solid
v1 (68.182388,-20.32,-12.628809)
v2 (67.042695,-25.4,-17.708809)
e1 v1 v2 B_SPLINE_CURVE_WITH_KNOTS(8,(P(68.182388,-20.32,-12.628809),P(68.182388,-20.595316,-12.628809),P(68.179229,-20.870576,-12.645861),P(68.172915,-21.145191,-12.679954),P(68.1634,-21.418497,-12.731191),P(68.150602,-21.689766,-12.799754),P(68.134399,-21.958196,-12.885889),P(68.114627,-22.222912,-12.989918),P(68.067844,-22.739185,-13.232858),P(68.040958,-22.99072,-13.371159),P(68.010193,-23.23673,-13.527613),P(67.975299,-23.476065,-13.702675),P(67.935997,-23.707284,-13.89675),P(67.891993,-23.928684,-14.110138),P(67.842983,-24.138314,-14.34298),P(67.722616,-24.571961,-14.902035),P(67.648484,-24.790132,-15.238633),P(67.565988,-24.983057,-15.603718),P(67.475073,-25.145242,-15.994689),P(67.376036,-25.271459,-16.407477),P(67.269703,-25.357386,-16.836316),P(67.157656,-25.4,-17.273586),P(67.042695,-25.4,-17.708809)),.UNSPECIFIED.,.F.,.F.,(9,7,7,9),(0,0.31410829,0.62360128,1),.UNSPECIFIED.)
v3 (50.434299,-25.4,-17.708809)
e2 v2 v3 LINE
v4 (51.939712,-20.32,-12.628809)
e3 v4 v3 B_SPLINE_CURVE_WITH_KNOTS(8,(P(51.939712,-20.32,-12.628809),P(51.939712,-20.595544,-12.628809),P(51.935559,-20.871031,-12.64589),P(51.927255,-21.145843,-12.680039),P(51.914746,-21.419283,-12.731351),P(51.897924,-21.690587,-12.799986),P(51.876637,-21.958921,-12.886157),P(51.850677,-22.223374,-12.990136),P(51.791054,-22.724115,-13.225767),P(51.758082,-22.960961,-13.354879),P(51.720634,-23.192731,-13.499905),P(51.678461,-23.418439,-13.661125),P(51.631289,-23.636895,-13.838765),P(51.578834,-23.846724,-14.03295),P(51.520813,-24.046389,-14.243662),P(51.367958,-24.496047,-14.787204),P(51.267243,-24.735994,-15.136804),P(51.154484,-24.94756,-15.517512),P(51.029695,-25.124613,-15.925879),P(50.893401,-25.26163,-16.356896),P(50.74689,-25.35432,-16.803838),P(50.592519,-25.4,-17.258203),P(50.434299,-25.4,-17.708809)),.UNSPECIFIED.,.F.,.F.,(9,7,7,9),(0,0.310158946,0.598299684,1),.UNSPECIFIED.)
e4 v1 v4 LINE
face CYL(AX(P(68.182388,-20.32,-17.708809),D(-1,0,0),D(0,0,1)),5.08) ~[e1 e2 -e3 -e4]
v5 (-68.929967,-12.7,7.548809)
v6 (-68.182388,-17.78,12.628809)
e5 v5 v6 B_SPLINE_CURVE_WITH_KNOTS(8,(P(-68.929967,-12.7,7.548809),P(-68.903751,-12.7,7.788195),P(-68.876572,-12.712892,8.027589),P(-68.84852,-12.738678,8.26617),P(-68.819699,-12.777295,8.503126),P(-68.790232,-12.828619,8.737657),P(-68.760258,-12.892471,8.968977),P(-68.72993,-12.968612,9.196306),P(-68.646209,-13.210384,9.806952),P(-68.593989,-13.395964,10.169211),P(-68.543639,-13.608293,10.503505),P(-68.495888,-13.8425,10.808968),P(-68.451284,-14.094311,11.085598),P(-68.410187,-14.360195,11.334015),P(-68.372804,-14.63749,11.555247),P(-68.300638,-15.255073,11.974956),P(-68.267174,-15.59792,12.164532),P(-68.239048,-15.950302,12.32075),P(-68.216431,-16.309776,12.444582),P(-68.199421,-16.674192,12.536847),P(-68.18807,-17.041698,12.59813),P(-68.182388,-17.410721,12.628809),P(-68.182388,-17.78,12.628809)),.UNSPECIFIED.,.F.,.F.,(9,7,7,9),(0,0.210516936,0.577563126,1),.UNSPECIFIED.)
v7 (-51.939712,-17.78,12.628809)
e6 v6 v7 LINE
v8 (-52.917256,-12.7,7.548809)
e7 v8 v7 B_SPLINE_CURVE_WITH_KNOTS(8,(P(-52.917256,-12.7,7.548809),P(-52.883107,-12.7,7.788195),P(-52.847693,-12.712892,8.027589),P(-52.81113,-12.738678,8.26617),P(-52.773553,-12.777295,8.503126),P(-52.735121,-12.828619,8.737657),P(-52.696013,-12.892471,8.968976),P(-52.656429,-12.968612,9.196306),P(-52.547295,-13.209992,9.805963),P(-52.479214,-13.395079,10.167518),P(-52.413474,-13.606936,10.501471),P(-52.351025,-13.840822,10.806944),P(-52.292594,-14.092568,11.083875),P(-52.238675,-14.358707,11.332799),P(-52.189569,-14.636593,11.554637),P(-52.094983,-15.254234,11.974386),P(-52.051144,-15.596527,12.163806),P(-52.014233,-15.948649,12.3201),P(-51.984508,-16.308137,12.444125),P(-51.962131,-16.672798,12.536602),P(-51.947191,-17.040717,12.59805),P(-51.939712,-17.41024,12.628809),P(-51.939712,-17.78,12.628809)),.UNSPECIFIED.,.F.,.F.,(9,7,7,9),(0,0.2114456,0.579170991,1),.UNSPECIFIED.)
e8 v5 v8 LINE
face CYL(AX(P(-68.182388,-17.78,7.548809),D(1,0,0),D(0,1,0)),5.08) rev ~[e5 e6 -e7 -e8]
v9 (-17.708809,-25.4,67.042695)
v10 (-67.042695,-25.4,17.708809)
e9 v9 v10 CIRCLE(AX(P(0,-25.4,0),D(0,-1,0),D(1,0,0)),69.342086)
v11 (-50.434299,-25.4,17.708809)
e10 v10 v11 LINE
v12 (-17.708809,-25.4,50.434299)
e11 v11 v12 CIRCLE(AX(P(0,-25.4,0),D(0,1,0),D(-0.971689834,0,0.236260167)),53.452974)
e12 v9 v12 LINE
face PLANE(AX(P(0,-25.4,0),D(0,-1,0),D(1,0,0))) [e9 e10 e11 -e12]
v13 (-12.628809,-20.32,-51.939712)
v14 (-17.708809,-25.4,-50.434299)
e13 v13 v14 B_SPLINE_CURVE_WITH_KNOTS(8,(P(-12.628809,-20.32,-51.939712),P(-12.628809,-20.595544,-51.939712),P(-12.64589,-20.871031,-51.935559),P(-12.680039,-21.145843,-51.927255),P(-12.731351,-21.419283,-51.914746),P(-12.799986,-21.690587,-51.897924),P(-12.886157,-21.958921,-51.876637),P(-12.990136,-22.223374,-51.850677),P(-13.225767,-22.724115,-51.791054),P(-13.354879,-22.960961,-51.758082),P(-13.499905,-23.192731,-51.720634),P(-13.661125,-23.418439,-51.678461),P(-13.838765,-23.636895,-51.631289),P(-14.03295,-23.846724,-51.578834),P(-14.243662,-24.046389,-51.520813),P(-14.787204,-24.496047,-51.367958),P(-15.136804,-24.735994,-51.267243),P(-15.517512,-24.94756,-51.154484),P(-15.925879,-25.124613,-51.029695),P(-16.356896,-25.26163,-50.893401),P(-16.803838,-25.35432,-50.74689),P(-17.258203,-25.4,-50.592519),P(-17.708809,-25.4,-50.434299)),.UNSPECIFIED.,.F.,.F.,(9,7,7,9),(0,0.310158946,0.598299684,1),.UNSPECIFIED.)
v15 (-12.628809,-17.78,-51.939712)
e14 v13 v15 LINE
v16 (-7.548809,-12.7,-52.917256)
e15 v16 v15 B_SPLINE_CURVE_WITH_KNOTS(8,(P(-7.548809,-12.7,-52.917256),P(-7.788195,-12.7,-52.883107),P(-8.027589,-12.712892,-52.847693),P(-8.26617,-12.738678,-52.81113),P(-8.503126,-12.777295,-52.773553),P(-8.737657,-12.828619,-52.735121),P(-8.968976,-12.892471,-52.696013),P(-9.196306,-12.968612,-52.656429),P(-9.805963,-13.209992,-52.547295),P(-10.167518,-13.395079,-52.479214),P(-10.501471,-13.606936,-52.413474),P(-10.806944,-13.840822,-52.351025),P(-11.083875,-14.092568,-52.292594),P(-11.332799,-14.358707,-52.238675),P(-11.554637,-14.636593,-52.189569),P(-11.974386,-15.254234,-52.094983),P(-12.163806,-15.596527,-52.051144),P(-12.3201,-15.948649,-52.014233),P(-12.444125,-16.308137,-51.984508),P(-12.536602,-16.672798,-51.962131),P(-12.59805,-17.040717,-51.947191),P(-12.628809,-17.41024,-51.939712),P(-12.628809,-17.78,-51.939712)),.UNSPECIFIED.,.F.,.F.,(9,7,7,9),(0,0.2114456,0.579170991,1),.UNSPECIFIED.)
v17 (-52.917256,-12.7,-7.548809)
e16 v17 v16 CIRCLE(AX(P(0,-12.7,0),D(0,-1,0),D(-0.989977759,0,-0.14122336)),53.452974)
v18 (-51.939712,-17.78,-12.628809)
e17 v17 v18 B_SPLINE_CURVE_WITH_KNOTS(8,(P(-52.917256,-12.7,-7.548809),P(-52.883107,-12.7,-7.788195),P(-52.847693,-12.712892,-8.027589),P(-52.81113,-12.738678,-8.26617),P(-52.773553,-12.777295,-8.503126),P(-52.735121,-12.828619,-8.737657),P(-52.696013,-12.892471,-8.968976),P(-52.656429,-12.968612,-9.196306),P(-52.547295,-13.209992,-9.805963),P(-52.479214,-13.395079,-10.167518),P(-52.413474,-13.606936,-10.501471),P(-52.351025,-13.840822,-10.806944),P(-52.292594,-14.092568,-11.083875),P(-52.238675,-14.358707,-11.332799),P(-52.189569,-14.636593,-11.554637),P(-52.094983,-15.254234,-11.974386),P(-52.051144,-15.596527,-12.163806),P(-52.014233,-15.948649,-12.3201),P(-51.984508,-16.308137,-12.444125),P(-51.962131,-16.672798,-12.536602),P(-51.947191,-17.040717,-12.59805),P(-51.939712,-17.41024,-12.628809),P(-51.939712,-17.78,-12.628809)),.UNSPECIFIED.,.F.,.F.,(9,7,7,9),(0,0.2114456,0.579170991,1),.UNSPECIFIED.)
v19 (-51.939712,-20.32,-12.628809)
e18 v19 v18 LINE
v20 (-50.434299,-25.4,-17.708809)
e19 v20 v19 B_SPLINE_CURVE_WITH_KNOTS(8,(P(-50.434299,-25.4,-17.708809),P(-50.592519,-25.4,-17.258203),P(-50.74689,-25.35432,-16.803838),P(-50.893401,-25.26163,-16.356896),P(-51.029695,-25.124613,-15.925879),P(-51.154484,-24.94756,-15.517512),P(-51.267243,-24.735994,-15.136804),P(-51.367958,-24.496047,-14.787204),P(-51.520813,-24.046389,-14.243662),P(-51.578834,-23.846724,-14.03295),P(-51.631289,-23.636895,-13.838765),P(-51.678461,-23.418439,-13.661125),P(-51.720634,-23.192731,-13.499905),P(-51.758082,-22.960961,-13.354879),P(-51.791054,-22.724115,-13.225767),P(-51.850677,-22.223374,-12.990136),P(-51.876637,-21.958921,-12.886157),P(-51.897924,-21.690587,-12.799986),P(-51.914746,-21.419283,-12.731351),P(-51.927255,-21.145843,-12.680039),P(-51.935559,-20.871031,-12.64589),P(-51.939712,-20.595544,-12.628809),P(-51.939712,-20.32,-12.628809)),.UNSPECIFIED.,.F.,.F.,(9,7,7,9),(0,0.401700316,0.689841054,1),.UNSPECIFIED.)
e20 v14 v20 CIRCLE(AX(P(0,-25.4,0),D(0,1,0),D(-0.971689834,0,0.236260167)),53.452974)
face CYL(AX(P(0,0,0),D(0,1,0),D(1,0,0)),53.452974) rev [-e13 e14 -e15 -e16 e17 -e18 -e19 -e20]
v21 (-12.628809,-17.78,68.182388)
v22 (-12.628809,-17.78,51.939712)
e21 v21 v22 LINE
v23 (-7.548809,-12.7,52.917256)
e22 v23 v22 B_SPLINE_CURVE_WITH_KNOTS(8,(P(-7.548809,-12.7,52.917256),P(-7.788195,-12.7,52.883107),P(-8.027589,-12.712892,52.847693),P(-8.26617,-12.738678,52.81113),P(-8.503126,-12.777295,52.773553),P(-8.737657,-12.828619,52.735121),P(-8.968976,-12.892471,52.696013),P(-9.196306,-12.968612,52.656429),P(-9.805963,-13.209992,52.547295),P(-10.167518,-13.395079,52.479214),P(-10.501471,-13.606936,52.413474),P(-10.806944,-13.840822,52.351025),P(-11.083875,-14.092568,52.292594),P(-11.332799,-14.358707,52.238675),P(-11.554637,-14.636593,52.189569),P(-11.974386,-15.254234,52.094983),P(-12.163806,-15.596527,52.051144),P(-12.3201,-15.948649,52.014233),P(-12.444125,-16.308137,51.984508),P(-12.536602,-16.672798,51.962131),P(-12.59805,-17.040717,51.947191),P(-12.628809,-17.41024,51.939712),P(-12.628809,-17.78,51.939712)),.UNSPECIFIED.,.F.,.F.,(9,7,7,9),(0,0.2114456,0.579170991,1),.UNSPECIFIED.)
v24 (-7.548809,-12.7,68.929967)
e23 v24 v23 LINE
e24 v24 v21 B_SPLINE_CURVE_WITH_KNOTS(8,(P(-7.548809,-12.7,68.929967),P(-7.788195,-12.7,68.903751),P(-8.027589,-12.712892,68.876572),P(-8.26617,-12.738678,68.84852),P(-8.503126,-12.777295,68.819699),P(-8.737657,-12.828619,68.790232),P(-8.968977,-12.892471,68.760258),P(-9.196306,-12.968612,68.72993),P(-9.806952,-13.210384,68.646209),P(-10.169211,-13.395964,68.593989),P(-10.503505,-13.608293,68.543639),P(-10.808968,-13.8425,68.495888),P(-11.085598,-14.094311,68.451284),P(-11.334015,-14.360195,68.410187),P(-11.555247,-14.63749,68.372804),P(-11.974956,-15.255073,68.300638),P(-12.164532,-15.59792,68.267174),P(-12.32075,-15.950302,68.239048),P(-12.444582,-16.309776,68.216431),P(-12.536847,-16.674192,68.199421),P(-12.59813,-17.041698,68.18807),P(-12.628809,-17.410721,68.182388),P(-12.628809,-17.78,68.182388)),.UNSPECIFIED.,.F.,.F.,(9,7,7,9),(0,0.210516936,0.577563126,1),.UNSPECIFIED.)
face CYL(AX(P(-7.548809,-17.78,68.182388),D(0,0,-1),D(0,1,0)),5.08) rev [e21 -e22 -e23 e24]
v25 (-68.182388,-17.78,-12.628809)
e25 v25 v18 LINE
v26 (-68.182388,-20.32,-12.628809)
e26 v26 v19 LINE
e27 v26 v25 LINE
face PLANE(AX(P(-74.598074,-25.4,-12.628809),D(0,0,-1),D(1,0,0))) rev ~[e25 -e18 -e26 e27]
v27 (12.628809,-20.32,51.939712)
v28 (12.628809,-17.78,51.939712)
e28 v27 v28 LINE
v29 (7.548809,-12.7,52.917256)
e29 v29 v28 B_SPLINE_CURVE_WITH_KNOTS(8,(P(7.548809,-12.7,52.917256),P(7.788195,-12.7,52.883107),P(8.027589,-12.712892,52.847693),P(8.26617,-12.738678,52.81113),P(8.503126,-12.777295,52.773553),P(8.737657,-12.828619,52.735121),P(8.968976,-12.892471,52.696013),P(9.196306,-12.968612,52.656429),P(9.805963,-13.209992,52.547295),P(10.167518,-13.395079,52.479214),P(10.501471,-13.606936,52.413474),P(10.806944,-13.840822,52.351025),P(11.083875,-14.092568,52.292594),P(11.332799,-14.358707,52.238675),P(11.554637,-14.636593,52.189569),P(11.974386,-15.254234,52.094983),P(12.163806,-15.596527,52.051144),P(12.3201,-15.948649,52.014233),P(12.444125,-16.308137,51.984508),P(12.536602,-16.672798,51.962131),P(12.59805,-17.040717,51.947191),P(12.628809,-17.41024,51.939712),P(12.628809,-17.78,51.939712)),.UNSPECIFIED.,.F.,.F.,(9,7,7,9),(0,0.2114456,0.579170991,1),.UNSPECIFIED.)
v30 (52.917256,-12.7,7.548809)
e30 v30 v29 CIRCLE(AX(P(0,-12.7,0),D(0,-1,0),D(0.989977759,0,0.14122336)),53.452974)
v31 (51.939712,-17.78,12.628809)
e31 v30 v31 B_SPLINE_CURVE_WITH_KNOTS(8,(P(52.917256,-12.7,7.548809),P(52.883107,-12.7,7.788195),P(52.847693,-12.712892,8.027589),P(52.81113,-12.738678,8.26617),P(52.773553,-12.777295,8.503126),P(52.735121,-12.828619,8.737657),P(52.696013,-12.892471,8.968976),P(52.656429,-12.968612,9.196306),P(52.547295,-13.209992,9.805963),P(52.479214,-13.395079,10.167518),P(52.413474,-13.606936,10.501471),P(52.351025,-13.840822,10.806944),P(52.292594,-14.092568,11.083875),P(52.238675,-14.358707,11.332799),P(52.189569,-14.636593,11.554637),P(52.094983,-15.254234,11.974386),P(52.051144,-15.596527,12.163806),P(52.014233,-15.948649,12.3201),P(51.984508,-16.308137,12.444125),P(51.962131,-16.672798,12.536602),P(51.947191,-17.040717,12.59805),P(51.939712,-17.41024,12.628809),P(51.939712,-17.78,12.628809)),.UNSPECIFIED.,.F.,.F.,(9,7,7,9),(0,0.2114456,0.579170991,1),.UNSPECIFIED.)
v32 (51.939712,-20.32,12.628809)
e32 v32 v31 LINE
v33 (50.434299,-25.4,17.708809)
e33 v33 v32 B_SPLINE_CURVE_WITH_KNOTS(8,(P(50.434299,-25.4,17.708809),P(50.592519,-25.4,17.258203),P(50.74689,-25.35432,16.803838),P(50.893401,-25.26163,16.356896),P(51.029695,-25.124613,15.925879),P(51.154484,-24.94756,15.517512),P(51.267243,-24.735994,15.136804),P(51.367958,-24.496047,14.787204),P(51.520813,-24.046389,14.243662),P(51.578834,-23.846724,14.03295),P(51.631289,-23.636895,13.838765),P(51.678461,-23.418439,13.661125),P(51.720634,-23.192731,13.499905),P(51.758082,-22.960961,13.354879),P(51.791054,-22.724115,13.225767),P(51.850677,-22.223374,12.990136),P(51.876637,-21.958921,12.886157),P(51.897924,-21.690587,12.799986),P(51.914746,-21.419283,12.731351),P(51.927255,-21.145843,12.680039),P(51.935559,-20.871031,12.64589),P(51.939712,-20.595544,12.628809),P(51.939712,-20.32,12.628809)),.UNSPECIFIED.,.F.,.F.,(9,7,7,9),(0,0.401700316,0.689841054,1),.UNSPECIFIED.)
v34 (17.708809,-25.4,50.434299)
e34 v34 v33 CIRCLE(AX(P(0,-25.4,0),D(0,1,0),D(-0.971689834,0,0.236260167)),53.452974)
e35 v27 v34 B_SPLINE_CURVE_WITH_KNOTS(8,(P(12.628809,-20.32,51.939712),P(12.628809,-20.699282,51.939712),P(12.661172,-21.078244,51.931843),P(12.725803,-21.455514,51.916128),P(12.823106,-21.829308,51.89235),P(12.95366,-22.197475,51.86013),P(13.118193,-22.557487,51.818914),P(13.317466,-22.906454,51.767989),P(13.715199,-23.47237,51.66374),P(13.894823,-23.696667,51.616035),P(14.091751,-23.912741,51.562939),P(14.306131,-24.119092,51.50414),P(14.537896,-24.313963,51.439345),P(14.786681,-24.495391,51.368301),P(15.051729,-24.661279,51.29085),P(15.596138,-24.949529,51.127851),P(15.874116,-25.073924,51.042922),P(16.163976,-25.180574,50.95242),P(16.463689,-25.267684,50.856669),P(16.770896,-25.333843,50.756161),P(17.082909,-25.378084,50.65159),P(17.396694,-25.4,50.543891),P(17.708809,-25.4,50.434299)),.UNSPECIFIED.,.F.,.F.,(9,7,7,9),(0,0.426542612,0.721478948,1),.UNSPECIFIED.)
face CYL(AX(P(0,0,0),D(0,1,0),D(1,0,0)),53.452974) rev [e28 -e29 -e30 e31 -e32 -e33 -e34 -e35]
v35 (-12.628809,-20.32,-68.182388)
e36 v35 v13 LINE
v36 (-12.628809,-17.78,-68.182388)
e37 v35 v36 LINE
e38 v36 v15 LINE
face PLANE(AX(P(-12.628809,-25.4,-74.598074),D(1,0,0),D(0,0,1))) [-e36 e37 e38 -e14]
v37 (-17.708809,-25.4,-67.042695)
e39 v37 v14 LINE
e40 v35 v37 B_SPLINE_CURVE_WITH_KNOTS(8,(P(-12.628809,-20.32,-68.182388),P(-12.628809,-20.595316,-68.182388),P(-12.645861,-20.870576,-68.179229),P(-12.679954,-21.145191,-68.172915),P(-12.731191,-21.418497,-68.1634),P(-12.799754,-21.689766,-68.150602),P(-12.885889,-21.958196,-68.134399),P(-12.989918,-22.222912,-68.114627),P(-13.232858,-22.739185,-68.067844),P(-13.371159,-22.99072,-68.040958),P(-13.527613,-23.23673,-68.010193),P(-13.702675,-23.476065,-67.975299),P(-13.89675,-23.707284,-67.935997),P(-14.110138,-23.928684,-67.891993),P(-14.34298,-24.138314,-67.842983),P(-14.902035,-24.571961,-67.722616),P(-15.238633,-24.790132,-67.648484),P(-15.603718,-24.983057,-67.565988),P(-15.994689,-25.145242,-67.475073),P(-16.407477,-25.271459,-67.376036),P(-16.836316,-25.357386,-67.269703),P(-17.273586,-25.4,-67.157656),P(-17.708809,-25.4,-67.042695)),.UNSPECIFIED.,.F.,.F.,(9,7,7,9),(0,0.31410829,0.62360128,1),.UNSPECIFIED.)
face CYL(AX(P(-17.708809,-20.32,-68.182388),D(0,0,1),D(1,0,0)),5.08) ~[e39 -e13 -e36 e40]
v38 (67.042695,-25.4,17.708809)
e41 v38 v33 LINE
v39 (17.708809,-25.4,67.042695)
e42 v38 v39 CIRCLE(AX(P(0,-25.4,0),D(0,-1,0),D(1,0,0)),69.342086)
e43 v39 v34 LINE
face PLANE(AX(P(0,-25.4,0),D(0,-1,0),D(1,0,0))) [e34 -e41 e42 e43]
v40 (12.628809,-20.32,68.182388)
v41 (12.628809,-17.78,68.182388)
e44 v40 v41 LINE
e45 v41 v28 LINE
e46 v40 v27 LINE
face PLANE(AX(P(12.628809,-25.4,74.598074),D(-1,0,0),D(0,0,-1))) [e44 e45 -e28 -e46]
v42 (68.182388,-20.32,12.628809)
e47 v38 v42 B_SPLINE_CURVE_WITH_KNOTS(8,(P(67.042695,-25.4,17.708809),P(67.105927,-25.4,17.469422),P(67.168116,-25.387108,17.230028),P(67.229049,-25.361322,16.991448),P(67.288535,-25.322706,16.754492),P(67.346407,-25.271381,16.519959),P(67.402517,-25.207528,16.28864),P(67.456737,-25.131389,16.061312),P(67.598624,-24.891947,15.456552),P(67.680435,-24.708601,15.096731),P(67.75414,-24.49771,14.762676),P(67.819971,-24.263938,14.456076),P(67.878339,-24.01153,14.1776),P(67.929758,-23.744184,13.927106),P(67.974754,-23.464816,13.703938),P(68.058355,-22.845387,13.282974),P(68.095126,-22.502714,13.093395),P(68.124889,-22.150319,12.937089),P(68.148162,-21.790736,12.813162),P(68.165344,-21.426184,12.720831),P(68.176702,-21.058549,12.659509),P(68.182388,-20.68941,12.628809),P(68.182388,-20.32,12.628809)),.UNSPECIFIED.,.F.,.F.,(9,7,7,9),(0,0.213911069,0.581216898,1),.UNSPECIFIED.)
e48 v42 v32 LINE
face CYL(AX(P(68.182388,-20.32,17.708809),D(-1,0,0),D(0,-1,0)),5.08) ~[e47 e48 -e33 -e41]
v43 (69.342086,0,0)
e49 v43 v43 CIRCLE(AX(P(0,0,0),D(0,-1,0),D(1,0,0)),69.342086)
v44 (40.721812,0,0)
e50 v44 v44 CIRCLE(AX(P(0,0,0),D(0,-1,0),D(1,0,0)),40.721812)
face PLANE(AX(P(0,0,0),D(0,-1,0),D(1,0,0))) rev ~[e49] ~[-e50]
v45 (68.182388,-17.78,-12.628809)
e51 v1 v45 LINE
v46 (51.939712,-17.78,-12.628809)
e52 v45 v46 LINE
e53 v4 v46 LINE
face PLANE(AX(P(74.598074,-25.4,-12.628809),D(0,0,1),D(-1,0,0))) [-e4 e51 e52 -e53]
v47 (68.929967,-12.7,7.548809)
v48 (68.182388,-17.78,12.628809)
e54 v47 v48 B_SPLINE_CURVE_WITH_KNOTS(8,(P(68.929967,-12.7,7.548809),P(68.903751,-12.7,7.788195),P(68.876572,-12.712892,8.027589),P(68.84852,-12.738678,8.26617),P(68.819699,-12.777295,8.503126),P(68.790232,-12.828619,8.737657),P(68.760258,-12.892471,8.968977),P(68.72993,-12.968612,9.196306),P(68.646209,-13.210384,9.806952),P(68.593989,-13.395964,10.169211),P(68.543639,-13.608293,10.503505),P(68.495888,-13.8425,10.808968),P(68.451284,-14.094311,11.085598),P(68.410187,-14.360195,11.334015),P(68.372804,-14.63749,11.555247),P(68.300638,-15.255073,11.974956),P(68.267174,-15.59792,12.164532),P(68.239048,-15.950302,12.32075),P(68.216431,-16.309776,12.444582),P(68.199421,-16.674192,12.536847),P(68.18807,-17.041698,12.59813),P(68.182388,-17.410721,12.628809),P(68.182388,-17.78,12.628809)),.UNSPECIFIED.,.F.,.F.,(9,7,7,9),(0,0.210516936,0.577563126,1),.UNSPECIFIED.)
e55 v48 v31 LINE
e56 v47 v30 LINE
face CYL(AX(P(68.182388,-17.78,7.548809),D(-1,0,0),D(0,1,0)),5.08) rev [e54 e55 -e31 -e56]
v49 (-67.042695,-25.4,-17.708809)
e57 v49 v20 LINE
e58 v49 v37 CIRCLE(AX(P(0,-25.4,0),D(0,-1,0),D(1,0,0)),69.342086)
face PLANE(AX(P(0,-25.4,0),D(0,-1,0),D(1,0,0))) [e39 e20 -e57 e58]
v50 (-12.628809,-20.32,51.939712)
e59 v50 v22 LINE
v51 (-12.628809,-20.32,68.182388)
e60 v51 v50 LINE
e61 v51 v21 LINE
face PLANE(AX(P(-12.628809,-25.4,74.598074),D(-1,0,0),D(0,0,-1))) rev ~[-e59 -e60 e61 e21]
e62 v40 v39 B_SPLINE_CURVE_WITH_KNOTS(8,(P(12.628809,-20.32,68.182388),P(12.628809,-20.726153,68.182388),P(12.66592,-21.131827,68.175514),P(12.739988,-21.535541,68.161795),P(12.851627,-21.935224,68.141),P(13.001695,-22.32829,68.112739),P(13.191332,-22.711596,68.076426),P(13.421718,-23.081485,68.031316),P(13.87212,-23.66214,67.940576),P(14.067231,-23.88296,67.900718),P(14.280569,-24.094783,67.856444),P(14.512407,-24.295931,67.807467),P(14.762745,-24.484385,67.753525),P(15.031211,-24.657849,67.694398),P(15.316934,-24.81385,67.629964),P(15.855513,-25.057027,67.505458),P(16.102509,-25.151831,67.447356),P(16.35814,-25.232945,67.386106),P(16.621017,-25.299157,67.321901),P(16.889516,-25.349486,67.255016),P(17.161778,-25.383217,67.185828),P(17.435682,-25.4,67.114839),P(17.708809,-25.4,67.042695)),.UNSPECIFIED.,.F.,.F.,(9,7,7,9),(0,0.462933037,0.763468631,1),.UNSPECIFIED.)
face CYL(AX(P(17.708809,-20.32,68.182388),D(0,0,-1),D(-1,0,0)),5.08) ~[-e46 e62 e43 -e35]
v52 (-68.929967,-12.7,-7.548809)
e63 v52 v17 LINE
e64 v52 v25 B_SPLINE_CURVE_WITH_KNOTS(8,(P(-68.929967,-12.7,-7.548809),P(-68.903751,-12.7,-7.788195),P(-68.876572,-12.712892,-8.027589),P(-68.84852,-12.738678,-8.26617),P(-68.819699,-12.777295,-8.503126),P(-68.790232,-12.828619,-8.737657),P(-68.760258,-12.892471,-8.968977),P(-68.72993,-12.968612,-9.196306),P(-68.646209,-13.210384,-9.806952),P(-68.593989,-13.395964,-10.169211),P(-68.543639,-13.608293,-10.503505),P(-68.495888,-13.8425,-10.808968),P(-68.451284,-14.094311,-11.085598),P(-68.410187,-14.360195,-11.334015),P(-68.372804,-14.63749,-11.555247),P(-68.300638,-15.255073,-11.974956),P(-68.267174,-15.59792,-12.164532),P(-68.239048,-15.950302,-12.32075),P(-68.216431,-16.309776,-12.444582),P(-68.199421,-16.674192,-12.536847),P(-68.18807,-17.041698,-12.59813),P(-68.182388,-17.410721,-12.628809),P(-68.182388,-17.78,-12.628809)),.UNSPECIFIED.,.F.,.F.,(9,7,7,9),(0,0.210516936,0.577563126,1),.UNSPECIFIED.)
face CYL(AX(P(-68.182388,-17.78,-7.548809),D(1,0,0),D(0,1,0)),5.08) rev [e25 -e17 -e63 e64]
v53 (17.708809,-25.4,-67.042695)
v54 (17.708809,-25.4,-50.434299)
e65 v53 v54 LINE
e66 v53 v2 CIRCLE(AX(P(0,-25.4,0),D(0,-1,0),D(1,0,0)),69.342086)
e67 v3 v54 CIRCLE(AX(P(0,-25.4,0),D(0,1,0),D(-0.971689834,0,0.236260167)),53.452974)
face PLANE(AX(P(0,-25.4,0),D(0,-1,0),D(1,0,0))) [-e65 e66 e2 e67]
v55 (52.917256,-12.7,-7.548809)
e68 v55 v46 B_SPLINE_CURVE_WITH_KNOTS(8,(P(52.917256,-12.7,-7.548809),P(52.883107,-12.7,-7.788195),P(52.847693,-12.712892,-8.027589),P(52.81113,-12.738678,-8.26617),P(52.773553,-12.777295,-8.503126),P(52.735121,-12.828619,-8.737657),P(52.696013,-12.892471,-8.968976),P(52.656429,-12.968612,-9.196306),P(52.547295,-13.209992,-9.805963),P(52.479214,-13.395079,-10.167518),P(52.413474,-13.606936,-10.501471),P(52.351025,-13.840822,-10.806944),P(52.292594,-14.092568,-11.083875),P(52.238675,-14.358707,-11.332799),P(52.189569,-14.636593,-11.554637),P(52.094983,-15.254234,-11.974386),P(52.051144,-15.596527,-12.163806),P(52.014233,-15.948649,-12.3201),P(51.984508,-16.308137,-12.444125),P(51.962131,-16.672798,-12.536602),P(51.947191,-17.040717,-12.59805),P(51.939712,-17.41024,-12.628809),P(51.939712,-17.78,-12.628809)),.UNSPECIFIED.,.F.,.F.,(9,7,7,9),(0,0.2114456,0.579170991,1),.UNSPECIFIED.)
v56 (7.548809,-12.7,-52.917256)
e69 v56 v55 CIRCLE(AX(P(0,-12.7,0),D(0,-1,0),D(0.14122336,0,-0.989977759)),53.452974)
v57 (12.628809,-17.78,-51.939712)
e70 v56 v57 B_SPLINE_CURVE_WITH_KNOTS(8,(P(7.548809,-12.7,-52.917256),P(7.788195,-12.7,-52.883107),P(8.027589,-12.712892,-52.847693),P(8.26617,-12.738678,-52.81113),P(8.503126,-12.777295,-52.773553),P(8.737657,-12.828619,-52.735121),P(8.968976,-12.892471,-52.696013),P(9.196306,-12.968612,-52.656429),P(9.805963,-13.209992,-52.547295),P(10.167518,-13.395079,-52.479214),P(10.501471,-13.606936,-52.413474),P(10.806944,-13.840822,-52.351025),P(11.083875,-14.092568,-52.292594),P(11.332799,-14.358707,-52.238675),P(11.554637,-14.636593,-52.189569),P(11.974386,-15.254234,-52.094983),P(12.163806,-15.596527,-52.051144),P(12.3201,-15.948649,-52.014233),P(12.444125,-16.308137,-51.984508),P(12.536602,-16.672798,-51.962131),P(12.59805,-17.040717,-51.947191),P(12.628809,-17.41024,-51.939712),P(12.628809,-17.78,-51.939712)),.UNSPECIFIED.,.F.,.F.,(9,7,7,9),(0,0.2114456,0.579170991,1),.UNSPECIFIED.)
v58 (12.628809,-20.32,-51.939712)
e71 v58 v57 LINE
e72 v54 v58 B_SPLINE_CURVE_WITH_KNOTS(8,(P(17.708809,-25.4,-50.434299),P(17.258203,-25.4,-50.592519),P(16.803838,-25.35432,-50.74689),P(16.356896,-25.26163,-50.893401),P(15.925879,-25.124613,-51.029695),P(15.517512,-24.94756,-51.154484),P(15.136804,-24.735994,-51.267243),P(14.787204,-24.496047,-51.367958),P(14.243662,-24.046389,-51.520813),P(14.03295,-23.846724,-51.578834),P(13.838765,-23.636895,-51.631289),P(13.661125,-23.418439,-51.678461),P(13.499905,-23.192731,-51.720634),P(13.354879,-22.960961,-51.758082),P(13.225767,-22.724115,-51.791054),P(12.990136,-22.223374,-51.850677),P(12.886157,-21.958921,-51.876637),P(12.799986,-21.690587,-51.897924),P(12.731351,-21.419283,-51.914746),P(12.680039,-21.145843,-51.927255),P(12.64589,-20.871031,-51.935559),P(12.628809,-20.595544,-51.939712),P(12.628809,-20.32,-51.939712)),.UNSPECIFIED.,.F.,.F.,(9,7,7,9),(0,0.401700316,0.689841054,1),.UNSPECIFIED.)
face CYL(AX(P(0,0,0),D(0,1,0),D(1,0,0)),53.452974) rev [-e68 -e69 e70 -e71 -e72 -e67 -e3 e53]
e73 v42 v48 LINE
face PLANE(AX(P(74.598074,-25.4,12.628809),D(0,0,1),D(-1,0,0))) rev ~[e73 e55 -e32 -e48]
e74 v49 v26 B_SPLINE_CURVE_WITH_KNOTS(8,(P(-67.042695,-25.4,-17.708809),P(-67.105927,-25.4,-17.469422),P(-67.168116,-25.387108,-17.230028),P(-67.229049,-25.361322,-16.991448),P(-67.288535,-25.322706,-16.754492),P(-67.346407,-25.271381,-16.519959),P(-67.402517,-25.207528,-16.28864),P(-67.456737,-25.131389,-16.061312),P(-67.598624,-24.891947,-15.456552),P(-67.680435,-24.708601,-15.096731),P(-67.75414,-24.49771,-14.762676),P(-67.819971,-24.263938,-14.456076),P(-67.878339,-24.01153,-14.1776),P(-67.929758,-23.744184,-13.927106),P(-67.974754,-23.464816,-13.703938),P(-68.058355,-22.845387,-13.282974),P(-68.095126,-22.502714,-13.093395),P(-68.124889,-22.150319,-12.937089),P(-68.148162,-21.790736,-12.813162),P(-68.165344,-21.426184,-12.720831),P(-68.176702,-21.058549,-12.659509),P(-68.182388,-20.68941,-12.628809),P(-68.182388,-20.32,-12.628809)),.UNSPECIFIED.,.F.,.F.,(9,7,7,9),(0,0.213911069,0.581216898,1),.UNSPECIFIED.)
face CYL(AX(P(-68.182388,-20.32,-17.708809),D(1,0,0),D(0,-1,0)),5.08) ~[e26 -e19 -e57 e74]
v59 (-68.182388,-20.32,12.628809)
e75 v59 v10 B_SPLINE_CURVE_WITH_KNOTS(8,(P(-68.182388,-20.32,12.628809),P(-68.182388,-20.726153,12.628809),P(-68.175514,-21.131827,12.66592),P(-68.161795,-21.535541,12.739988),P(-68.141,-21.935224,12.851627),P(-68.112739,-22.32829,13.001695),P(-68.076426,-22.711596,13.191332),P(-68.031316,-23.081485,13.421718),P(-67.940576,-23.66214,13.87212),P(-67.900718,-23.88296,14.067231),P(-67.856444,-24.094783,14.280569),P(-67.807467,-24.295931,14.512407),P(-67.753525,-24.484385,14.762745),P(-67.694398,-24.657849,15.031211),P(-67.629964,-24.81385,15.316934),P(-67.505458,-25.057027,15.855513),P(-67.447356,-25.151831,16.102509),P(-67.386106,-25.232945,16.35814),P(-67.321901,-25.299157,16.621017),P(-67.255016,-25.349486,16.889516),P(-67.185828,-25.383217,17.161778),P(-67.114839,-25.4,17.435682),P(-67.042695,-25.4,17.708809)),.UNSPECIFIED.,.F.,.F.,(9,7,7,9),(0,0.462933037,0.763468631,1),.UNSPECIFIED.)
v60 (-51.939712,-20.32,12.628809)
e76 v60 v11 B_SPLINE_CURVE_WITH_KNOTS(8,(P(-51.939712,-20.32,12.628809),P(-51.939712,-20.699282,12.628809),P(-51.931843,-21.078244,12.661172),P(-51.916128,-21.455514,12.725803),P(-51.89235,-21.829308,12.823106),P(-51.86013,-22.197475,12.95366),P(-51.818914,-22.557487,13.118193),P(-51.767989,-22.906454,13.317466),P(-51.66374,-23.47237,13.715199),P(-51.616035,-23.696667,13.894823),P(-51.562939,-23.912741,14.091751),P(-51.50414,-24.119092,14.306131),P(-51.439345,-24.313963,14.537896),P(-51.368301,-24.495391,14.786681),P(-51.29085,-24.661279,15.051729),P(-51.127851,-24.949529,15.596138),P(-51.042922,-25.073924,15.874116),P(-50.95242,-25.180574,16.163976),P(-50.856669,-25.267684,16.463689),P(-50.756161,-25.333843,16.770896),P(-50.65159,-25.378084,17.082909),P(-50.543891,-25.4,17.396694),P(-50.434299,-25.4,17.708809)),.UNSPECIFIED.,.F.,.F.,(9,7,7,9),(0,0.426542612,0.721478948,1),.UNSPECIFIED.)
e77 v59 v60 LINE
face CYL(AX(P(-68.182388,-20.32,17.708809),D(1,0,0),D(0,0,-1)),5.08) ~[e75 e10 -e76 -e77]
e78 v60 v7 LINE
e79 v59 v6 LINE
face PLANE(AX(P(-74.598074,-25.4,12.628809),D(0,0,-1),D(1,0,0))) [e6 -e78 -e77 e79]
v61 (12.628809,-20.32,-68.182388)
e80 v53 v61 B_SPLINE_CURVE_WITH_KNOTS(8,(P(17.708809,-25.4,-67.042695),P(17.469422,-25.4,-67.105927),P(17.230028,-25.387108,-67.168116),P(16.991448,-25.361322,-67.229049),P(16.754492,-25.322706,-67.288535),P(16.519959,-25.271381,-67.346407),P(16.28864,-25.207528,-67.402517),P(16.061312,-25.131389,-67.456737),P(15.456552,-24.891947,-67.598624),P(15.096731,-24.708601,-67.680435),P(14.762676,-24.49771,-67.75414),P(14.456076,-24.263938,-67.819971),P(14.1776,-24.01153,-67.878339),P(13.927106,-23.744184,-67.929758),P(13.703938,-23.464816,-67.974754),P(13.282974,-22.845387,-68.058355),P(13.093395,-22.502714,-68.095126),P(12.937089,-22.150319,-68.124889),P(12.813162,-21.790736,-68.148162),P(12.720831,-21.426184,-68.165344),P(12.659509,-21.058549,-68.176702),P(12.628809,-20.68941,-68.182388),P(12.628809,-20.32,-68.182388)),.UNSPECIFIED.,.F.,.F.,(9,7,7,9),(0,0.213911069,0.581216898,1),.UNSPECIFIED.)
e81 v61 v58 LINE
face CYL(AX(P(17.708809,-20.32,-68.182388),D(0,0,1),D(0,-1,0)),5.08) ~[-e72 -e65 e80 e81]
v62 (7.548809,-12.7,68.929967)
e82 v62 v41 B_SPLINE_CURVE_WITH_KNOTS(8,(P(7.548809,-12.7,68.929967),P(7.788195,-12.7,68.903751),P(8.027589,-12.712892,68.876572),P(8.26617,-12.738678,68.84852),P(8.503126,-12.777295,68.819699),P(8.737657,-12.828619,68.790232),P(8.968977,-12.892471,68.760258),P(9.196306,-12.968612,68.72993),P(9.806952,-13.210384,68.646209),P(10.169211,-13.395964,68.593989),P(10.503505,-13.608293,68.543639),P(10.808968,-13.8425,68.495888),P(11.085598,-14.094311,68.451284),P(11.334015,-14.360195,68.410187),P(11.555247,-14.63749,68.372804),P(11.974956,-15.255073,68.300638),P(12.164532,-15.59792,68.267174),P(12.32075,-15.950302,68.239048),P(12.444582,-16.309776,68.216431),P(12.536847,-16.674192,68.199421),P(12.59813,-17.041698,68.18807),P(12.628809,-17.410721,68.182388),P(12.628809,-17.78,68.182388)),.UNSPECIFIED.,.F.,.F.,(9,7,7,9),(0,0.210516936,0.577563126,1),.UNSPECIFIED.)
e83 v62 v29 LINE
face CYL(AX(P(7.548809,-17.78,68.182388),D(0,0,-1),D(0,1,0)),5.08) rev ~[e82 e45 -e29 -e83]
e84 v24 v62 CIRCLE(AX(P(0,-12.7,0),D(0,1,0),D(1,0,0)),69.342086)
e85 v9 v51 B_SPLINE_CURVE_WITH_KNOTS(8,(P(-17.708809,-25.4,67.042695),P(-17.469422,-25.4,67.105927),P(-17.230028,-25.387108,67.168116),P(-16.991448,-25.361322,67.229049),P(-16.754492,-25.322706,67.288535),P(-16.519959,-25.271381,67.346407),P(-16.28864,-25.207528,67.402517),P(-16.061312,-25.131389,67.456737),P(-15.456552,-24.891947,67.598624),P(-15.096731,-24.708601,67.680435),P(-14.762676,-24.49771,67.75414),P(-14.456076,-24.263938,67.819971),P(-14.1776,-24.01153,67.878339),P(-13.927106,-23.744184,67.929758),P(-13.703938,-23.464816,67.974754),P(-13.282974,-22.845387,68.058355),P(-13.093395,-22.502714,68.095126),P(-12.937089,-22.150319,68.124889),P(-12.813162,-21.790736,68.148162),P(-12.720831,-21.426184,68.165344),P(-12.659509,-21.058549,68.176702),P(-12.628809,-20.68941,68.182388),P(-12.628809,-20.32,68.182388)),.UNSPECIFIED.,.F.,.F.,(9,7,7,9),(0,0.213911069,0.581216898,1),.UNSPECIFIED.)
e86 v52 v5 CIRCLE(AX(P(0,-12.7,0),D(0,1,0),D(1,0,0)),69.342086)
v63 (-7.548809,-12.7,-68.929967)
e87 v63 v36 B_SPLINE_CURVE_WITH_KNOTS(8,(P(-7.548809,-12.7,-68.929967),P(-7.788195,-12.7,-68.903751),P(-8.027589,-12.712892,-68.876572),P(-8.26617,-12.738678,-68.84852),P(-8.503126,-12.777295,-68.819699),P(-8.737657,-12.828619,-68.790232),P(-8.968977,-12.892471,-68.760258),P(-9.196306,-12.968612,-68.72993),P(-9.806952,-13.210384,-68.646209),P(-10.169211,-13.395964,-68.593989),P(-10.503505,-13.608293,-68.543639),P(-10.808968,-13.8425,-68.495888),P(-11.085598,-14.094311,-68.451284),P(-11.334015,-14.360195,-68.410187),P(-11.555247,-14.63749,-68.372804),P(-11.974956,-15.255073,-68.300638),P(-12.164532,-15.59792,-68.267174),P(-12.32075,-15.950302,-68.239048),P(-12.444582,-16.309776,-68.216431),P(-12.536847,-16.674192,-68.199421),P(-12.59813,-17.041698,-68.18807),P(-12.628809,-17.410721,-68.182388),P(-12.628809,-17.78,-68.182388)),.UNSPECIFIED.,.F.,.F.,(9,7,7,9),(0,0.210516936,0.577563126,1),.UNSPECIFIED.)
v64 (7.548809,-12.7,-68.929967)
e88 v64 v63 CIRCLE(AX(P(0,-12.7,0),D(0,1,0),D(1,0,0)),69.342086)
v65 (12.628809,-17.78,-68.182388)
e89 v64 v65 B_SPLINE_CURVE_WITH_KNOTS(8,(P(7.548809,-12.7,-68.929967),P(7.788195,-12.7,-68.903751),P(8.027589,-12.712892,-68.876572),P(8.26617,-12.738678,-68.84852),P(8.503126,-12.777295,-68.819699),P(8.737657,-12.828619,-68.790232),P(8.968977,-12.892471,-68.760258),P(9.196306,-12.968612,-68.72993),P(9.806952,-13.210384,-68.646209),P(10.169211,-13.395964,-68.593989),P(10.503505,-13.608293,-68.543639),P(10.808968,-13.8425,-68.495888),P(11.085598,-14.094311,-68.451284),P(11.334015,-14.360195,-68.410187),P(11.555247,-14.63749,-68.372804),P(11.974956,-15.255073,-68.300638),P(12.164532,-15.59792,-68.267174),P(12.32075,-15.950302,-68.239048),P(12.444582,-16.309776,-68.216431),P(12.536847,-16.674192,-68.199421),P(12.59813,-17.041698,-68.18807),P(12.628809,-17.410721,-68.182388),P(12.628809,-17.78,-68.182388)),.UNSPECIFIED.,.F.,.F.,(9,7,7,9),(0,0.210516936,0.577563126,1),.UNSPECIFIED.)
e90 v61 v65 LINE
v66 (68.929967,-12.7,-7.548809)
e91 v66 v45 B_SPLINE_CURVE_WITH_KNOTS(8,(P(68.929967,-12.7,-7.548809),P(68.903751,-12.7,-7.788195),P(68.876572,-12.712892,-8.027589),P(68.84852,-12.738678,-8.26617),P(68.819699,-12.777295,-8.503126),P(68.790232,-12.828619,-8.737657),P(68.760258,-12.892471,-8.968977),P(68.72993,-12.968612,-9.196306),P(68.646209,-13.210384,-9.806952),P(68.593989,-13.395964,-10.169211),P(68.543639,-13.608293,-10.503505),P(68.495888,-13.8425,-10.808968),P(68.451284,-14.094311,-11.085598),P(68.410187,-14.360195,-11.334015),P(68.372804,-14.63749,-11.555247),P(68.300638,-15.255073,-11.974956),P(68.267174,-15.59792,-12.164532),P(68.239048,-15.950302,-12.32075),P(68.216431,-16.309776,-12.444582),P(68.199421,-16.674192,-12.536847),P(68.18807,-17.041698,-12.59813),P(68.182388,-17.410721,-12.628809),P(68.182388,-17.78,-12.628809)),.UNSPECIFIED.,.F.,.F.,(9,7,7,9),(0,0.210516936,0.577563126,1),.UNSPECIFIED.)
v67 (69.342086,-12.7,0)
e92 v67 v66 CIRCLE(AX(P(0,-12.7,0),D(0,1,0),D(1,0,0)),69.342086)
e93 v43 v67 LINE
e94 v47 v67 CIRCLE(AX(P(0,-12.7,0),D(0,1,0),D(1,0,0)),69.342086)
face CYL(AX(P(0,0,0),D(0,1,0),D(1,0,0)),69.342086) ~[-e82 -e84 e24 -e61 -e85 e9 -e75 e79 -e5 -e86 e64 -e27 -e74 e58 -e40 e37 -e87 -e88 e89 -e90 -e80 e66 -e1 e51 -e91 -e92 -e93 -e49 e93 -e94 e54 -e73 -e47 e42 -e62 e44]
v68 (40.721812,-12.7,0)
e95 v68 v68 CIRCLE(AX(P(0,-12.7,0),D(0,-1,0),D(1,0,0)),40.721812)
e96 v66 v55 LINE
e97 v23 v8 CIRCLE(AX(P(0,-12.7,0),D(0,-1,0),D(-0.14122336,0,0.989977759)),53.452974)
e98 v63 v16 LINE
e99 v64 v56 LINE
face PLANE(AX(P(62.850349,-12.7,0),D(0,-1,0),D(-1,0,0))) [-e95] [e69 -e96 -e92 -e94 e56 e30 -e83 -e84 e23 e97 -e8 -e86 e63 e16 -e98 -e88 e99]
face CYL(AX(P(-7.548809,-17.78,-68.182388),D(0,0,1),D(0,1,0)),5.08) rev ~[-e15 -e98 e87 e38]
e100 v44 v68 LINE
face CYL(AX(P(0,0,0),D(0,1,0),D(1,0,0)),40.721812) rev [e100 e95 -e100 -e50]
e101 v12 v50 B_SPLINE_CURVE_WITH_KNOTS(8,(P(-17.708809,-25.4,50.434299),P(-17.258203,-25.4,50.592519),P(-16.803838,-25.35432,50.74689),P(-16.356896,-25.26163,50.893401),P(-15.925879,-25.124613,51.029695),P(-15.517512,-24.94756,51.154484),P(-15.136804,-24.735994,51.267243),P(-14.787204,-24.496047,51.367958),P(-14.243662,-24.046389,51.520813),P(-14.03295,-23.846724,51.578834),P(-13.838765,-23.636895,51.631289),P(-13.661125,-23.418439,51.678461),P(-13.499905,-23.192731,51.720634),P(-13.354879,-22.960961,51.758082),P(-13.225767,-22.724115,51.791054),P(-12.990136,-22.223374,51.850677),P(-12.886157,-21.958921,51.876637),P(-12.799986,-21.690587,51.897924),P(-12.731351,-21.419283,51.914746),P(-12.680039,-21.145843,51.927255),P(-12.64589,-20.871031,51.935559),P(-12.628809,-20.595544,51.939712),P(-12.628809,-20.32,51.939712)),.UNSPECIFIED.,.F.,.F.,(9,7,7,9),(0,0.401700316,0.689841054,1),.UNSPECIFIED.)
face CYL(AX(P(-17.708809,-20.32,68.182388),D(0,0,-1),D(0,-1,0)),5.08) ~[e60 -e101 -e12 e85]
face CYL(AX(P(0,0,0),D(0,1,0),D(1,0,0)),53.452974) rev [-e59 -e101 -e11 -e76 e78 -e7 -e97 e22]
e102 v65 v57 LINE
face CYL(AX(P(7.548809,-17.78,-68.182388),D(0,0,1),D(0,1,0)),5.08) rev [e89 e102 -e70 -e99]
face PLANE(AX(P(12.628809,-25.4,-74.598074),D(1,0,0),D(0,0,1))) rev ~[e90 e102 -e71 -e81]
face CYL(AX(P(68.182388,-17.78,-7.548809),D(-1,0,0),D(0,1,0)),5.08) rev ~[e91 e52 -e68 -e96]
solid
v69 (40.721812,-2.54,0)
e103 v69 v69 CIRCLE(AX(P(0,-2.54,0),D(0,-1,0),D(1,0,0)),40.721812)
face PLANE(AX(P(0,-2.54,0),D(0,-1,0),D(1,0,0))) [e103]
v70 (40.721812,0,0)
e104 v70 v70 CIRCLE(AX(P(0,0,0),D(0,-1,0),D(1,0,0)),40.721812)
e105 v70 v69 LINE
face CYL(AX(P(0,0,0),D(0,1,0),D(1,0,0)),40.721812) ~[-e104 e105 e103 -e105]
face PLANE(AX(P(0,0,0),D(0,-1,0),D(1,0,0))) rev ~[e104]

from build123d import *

# Parameters (mm, degrees)
F0_R            = 40.7218115667
F1_DEPTH        = 2.54
F0_R_2          = 53.4529743156
F2_DEPTH        = 12.7
F0_R_3          = 69.3420856698
F3_DEPTH        = 25.4
F4_W            = 23.4954506159
F4_H            = 25.2576172352
F5_DEPTH        = 12.7
F5_COPIES_COUNT = 4
F6_R            = 5.08


# Not quite as in the source:
# - a pattern or mirror of a feature is missing from the dataset's text; its kind, count and spacing are read off the source's solid


with BuildPart() as f1:
    # F0 (on Front) → F1 (new body)
    with BuildSketch(Plane.XZ):
        Circle(F0_R)
    extrude(amount=F1_DEPTH)


with BuildPart() as f2:
    # F0 (on Front) → F2 (new body)
    with BuildSketch(Plane.XZ):
        Circle(F0_R_2)
        Circle(F0_R, mode=Mode.SUBTRACT)
    extrude(amount=F2_DEPTH)

    # F0 (on Front) → F3 (join)
    with BuildSketch(Plane.XZ):
        Circle(F0_R_3)
        Circle(F0_R_2, mode=Mode.SUBTRACT)
    extrude(amount=F3_DEPTH)

    # F4 (on face) → F5 (cut)
    with BuildSketch(Plane.XZ.offset(25.4)):
        with Locations((-62.8503486514, 0)):
            Rectangle(F4_W, F4_H)
    f5 = extrude(amount=-F5_DEPTH, mode=Mode.SUBTRACT)

    # F5_copies: F5 ×4 about axis
    f5_copies_axis = Axis((0, 0, 0), (0, 1, 0))
    for i in range(1, F5_COPIES_COUNT):
        add(f5.rotate(f5_copies_axis, i * 360 / F5_COPIES_COUNT), mode=Mode.SUBTRACT)

    # F6
    f6_edges = [f2.edges().sort_by_distance(p)[0] for p in [
        (-60.06105, -12.7, 12.628809),
        (-60.06105, -12.7, -12.628809),
        (-60.06105, -25.4, -12.628809),
        (-60.06105, -25.4, 12.628809),
        (-12.628809, -12.7, -60.06105),
        (12.628809, -12.7, -60.06105),
        (60.06105, -12.7, -12.628809),
        (60.06105, -12.7, 12.628809),
        (12.628809, -12.7, 60.06105),
        (-12.628809, -12.7, 60.06105),
        (-12.628809, -25.4, 60.06105),
        (12.628809, -25.4, 60.06105),
        (60.06105, -25.4, 12.628809),
        (60.06105, -25.4, -12.628809),
        (12.628809, -25.4, -60.06105),
        (-12.628809, -25.4, -60.06105),
    ]]
    fillet(f6_edges, radius=F6_R)


solid = Compound([f1.part, f2.part])
